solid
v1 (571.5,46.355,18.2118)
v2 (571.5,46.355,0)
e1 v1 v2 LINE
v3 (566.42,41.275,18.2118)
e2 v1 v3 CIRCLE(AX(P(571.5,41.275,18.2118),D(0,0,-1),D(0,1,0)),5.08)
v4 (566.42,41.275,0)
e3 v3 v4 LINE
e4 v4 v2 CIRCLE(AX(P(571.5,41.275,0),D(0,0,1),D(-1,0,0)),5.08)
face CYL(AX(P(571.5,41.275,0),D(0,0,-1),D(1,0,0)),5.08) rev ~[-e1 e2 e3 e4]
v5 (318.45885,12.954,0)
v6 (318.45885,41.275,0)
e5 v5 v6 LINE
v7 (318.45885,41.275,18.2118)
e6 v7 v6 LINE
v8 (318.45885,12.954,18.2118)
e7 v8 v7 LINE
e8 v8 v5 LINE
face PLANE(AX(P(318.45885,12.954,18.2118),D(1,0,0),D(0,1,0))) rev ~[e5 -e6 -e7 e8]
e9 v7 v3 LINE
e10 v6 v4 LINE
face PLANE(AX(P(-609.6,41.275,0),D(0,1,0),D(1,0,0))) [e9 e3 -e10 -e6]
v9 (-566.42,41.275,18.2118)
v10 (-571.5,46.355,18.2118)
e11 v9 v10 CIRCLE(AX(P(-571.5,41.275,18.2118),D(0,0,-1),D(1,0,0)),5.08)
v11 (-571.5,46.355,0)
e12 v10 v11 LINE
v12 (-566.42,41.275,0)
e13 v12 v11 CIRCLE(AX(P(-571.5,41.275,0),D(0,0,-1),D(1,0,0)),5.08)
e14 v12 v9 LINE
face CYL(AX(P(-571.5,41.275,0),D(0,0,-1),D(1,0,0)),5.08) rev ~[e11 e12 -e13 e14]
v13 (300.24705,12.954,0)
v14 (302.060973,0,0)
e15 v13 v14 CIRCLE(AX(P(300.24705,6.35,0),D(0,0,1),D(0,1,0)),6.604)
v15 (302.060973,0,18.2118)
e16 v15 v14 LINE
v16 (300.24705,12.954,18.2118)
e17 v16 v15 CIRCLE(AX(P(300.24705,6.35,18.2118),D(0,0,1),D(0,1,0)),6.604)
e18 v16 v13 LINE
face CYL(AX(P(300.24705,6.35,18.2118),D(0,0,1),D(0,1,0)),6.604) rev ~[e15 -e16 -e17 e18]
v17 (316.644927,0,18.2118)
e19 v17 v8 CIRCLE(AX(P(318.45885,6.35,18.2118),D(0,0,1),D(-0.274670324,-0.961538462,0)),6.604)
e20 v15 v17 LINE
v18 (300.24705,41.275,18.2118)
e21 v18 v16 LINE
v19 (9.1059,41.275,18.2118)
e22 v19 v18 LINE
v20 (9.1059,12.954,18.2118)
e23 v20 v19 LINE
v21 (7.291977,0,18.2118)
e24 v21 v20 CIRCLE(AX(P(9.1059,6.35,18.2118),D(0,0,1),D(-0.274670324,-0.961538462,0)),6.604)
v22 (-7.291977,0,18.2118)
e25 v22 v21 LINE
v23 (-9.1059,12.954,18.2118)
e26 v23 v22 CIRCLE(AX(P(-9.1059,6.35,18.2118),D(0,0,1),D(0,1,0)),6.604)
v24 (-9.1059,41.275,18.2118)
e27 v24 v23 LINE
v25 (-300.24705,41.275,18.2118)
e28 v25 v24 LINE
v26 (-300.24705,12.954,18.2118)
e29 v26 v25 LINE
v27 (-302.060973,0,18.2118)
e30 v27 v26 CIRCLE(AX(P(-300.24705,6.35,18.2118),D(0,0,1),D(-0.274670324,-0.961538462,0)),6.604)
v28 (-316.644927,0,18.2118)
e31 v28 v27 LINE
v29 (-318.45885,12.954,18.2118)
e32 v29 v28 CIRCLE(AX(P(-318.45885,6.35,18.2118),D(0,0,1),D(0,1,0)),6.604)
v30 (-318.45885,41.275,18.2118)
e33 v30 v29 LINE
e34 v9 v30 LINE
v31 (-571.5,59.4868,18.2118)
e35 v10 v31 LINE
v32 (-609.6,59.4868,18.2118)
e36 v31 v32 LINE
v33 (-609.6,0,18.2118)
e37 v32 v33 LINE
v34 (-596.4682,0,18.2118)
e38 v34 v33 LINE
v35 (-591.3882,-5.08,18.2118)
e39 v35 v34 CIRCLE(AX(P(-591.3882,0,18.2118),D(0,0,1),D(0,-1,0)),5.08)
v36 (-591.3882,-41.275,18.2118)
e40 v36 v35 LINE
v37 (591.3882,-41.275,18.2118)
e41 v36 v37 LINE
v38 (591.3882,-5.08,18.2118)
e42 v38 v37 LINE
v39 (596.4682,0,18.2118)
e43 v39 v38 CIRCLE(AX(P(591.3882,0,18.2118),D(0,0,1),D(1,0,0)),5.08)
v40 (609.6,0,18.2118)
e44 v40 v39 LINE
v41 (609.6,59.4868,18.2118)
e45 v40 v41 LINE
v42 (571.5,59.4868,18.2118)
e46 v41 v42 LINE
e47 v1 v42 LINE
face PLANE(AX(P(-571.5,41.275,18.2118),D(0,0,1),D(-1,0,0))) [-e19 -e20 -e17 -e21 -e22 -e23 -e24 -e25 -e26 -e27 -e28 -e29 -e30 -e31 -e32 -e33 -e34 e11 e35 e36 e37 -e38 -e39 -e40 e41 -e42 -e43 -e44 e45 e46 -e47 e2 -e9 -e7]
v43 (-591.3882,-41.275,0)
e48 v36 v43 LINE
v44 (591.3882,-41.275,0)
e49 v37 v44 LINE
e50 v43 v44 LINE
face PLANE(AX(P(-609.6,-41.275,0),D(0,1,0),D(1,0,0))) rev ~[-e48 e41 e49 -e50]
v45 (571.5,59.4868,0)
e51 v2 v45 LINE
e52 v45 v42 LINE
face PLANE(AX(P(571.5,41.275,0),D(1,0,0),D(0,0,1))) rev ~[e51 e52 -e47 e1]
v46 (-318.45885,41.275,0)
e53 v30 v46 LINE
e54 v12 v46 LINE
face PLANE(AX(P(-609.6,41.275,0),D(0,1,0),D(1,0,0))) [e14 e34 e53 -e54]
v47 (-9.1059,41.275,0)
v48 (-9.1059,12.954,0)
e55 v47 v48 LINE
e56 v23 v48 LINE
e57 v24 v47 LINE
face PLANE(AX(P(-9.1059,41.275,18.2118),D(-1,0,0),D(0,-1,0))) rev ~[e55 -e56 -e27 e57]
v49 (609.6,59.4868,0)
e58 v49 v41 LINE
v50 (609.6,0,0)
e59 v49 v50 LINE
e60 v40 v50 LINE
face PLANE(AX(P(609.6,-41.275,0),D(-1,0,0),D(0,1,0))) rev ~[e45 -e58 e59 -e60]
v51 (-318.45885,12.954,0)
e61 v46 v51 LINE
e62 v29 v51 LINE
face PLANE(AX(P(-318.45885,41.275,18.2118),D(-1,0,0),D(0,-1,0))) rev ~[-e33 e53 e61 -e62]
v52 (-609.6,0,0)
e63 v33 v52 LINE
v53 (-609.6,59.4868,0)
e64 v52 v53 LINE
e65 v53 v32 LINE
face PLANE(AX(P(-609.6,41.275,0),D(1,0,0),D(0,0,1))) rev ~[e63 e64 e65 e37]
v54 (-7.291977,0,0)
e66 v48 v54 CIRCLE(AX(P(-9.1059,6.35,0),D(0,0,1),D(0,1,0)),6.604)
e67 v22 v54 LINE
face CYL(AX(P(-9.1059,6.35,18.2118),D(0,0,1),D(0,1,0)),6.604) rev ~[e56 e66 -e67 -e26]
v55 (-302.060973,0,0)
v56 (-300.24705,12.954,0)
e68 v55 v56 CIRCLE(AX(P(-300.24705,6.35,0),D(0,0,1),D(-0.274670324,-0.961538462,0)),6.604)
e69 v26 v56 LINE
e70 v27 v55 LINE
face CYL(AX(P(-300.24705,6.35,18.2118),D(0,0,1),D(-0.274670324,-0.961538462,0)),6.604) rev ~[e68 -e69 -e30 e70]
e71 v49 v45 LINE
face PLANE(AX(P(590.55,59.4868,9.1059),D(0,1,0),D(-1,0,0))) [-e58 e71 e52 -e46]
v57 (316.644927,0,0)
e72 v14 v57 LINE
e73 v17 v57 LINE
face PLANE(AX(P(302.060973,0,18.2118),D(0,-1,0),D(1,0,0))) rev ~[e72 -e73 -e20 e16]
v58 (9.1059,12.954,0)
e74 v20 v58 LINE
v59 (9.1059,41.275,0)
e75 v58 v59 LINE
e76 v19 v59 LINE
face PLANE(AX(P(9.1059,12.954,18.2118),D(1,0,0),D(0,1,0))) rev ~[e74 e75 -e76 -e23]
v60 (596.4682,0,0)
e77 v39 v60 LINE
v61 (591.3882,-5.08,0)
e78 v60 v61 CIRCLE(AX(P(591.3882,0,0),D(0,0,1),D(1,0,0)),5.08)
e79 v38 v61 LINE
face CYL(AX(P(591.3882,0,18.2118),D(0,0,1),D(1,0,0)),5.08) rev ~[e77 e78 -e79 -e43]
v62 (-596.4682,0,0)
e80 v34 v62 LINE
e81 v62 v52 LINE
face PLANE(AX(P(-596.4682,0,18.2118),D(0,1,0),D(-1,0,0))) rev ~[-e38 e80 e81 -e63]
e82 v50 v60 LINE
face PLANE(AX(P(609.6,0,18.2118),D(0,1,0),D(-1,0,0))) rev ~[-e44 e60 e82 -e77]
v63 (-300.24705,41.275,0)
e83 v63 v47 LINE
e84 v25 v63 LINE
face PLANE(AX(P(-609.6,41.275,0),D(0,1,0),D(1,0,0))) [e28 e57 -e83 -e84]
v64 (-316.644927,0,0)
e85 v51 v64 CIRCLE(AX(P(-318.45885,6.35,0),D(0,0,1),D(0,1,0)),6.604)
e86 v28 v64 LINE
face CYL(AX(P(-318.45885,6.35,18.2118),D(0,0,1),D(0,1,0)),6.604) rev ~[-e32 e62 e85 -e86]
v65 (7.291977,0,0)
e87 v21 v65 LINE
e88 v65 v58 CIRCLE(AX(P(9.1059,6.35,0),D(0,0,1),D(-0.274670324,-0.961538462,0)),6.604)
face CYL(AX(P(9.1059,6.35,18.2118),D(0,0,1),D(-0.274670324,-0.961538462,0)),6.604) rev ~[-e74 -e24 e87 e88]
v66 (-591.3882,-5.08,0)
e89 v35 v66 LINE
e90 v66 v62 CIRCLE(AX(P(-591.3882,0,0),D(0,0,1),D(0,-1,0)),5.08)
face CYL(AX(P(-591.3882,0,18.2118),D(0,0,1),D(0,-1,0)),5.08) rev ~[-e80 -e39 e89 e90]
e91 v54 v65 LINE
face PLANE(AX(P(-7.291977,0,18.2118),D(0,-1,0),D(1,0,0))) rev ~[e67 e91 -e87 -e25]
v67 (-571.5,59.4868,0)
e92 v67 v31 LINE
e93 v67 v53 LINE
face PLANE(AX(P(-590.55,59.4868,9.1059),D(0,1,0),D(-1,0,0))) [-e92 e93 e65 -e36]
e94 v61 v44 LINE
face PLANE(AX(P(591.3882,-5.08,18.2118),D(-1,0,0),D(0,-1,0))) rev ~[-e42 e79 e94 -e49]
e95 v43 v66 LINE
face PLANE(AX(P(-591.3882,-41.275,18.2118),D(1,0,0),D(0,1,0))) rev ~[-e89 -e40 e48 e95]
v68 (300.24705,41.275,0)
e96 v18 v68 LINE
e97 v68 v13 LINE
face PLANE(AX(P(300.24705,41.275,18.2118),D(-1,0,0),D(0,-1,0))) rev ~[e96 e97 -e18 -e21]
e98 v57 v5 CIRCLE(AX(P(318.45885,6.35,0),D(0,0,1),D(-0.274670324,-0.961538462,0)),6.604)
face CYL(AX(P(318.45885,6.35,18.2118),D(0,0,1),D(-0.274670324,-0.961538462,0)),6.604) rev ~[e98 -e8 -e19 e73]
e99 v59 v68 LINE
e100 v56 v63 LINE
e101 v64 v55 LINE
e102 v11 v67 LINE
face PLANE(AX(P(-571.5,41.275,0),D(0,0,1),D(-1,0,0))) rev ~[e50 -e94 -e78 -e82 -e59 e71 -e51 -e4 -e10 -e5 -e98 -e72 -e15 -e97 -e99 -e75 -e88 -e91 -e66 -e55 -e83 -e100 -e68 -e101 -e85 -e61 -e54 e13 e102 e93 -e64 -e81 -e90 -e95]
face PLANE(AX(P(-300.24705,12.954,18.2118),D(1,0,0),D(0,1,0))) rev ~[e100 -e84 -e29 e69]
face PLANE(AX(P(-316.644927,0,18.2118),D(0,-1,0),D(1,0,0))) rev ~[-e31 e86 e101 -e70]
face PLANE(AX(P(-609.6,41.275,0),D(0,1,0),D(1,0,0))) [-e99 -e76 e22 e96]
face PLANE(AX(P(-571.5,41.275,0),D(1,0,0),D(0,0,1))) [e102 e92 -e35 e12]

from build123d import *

# Parameters (mm, degrees)
F1_W      = 1219.2
F1_H      = 82.55
F2_DEPTH  = 18.2118
F4_DEPTH  = 18.2128
F6_DEPTH  = 18.2128
F7_W      = 38.1
F7_H      = 18.2118
F8_DEPTH  = 18.2118
F9_R      = 5.08
F10_DEPTH = 18.2128


# Not quite as in the source:
# - a variable given as a bare number and used for a length is read in inches; the dataset says mm whatever the document's units were


with BuildPart() as f2:
    # F1 (on Top) → F2 (new body)
    with BuildSketch(Plane.XY):
        Rectangle(F1_W, F1_H)
    extrude(amount=F2_DEPTH)

    # F3 (on face) → F4 (cut, through all)
    with BuildSketch(Plane.XY.offset(18.2118)):
        Polygon((-609.6, 0), (-609.6, -41.275), (-591.3882, -41.275), (-591.3882, -5.08), (-591.3882, 0), (-596.4682, 0), align=None)
        with BuildLine():
            Line((-591.3882, 0), (-591.3882, -5.08))
            ThreePointArc((-591.3882, -5.08), (-587.7960975516, 3.5921024484), (-596.4682, 0))
            Line((-596.4682, 0), (-591.3882, 0))
        make_face()
        with BuildLine():
            Line((591.3882, 0), (596.4682, 0))
            ThreePointArc((596.4682, 0), (587.7960975516, 3.5921024484), (591.3882, -5.08))
            Line((591.3882, -5.08), (591.3882, 0))
        make_face()
        Polygon((591.3882, -5.08), (591.3882, -41.275), (609.6, -41.275), (609.6, 0), (596.4682, 0), (591.3882, 0), align=None)
    extrude(amount=-F4_DEPTH, mode=Mode.SUBTRACT)

    # F5 (on face) → F6 (cut, through all)
    with BuildSketch(Plane.XY.offset(18.2118)):
        Polygon((-300.24705, 41.275), (-318.45885, 41.275), (-318.45885, 12.954), (-318.45885, 0), (-316.6449271791, 0), (-302.0609728209, 0), (-300.24705, 0), (-300.24705, 12.954), align=None)
        with BuildLine():
            Line((-318.45885, 0), (-318.45885, 12.954))
            ThreePointArc((-318.45885, 12.954), (-324.9990417403, 5.434189976), (-316.6449271791, 0))
            Line((-316.6449271791, 0), (-318.45885, 0))
        make_face()
        with BuildLine():
            ThreePointArc((-302.0609728209, 0), (-293.7068582597, 5.434189976), (-300.24705, 12.954))
            Line((-300.24705, 12.954), (-300.24705, 0))
            Line((-300.24705, 0), (-302.0609728209, 0))
        make_face()
        Polygon((318.45885, 41.275), (300.24705, 41.275), (300.24705, 12.954), (300.24705, 0), (302.0609728208, 0), (316.6449271792, 0), (318.45885, 0), (318.45885, 12.954), align=None)
        with BuildLine():
            Line((300.24705, 0), (300.24705, 12.954))
            ThreePointArc((300.24705, 12.954), (293.7068582597, 5.434189976), (302.0609728208, 0))
            Line((302.0609728208, 0), (300.24705, 0))
        make_face()
        with BuildLine():
            ThreePointArc((316.6449271792, 0), (324.9990417403, 5.434189976), (318.45885, 12.954))
            Line((318.45885, 12.954), (318.45885, 0))
            Line((318.45885, 0), (316.6449271792, 0))
        make_face()
        Polygon((9.1059, 41.275), (-9.1059, 41.275), (-9.1059, 12.954), (-9.1059, 0), (-7.2919771792, 0), (7.2919771792, 0), (9.1059, 0), (9.1059, 12.954), align=None)
        with BuildLine():
            Line((-9.1059, 0), (-9.1059, 12.954))
            ThreePointArc((-9.1059, 12.954), (-15.6460917403, 5.434189976), (-7.2919771792, 0))
            Line((-7.2919771792, 0), (-9.1059, 0))
        make_face()
        with BuildLine():
            ThreePointArc((7.2919771792, 0), (15.6460917403, 5.434189976), (9.1059, 12.954))
            Line((9.1059, 12.954), (9.1059, 0))
            Line((9.1059, 0), (7.2919771792, 0))
        make_face()
    extrude(amount=-F6_DEPTH, mode=Mode.SUBTRACT)

    # F7 (on face) → F8 (join)
    with BuildSketch(Plane(origin=(0, 41.275, 0), x_dir=(-1, 0, 0), z_dir=(0, 1, 0))):
        with Locations((590.55, 9.1059)):
            Rectangle(F7_W, F7_H)
        with Locations((-590.55, 9.1059)):
            Rectangle(F7_W, F7_H)
    extrude(amount=F8_DEPTH)

    # F9 (on face) → F10 (cut, through all)
    with BuildSketch(Plane(origin=(0, 0, 0), x_dir=(1, 0, 0), z_dir=(0, 0, -1))):
        with Locations((571.5, -41.275)):
            Circle(F9_R)
        with Locations((-571.5, -41.275)):
            Circle(F9_R)
    extrude(amount=-F10_DEPTH, mode=Mode.SUBTRACT)


solid = f2.part
